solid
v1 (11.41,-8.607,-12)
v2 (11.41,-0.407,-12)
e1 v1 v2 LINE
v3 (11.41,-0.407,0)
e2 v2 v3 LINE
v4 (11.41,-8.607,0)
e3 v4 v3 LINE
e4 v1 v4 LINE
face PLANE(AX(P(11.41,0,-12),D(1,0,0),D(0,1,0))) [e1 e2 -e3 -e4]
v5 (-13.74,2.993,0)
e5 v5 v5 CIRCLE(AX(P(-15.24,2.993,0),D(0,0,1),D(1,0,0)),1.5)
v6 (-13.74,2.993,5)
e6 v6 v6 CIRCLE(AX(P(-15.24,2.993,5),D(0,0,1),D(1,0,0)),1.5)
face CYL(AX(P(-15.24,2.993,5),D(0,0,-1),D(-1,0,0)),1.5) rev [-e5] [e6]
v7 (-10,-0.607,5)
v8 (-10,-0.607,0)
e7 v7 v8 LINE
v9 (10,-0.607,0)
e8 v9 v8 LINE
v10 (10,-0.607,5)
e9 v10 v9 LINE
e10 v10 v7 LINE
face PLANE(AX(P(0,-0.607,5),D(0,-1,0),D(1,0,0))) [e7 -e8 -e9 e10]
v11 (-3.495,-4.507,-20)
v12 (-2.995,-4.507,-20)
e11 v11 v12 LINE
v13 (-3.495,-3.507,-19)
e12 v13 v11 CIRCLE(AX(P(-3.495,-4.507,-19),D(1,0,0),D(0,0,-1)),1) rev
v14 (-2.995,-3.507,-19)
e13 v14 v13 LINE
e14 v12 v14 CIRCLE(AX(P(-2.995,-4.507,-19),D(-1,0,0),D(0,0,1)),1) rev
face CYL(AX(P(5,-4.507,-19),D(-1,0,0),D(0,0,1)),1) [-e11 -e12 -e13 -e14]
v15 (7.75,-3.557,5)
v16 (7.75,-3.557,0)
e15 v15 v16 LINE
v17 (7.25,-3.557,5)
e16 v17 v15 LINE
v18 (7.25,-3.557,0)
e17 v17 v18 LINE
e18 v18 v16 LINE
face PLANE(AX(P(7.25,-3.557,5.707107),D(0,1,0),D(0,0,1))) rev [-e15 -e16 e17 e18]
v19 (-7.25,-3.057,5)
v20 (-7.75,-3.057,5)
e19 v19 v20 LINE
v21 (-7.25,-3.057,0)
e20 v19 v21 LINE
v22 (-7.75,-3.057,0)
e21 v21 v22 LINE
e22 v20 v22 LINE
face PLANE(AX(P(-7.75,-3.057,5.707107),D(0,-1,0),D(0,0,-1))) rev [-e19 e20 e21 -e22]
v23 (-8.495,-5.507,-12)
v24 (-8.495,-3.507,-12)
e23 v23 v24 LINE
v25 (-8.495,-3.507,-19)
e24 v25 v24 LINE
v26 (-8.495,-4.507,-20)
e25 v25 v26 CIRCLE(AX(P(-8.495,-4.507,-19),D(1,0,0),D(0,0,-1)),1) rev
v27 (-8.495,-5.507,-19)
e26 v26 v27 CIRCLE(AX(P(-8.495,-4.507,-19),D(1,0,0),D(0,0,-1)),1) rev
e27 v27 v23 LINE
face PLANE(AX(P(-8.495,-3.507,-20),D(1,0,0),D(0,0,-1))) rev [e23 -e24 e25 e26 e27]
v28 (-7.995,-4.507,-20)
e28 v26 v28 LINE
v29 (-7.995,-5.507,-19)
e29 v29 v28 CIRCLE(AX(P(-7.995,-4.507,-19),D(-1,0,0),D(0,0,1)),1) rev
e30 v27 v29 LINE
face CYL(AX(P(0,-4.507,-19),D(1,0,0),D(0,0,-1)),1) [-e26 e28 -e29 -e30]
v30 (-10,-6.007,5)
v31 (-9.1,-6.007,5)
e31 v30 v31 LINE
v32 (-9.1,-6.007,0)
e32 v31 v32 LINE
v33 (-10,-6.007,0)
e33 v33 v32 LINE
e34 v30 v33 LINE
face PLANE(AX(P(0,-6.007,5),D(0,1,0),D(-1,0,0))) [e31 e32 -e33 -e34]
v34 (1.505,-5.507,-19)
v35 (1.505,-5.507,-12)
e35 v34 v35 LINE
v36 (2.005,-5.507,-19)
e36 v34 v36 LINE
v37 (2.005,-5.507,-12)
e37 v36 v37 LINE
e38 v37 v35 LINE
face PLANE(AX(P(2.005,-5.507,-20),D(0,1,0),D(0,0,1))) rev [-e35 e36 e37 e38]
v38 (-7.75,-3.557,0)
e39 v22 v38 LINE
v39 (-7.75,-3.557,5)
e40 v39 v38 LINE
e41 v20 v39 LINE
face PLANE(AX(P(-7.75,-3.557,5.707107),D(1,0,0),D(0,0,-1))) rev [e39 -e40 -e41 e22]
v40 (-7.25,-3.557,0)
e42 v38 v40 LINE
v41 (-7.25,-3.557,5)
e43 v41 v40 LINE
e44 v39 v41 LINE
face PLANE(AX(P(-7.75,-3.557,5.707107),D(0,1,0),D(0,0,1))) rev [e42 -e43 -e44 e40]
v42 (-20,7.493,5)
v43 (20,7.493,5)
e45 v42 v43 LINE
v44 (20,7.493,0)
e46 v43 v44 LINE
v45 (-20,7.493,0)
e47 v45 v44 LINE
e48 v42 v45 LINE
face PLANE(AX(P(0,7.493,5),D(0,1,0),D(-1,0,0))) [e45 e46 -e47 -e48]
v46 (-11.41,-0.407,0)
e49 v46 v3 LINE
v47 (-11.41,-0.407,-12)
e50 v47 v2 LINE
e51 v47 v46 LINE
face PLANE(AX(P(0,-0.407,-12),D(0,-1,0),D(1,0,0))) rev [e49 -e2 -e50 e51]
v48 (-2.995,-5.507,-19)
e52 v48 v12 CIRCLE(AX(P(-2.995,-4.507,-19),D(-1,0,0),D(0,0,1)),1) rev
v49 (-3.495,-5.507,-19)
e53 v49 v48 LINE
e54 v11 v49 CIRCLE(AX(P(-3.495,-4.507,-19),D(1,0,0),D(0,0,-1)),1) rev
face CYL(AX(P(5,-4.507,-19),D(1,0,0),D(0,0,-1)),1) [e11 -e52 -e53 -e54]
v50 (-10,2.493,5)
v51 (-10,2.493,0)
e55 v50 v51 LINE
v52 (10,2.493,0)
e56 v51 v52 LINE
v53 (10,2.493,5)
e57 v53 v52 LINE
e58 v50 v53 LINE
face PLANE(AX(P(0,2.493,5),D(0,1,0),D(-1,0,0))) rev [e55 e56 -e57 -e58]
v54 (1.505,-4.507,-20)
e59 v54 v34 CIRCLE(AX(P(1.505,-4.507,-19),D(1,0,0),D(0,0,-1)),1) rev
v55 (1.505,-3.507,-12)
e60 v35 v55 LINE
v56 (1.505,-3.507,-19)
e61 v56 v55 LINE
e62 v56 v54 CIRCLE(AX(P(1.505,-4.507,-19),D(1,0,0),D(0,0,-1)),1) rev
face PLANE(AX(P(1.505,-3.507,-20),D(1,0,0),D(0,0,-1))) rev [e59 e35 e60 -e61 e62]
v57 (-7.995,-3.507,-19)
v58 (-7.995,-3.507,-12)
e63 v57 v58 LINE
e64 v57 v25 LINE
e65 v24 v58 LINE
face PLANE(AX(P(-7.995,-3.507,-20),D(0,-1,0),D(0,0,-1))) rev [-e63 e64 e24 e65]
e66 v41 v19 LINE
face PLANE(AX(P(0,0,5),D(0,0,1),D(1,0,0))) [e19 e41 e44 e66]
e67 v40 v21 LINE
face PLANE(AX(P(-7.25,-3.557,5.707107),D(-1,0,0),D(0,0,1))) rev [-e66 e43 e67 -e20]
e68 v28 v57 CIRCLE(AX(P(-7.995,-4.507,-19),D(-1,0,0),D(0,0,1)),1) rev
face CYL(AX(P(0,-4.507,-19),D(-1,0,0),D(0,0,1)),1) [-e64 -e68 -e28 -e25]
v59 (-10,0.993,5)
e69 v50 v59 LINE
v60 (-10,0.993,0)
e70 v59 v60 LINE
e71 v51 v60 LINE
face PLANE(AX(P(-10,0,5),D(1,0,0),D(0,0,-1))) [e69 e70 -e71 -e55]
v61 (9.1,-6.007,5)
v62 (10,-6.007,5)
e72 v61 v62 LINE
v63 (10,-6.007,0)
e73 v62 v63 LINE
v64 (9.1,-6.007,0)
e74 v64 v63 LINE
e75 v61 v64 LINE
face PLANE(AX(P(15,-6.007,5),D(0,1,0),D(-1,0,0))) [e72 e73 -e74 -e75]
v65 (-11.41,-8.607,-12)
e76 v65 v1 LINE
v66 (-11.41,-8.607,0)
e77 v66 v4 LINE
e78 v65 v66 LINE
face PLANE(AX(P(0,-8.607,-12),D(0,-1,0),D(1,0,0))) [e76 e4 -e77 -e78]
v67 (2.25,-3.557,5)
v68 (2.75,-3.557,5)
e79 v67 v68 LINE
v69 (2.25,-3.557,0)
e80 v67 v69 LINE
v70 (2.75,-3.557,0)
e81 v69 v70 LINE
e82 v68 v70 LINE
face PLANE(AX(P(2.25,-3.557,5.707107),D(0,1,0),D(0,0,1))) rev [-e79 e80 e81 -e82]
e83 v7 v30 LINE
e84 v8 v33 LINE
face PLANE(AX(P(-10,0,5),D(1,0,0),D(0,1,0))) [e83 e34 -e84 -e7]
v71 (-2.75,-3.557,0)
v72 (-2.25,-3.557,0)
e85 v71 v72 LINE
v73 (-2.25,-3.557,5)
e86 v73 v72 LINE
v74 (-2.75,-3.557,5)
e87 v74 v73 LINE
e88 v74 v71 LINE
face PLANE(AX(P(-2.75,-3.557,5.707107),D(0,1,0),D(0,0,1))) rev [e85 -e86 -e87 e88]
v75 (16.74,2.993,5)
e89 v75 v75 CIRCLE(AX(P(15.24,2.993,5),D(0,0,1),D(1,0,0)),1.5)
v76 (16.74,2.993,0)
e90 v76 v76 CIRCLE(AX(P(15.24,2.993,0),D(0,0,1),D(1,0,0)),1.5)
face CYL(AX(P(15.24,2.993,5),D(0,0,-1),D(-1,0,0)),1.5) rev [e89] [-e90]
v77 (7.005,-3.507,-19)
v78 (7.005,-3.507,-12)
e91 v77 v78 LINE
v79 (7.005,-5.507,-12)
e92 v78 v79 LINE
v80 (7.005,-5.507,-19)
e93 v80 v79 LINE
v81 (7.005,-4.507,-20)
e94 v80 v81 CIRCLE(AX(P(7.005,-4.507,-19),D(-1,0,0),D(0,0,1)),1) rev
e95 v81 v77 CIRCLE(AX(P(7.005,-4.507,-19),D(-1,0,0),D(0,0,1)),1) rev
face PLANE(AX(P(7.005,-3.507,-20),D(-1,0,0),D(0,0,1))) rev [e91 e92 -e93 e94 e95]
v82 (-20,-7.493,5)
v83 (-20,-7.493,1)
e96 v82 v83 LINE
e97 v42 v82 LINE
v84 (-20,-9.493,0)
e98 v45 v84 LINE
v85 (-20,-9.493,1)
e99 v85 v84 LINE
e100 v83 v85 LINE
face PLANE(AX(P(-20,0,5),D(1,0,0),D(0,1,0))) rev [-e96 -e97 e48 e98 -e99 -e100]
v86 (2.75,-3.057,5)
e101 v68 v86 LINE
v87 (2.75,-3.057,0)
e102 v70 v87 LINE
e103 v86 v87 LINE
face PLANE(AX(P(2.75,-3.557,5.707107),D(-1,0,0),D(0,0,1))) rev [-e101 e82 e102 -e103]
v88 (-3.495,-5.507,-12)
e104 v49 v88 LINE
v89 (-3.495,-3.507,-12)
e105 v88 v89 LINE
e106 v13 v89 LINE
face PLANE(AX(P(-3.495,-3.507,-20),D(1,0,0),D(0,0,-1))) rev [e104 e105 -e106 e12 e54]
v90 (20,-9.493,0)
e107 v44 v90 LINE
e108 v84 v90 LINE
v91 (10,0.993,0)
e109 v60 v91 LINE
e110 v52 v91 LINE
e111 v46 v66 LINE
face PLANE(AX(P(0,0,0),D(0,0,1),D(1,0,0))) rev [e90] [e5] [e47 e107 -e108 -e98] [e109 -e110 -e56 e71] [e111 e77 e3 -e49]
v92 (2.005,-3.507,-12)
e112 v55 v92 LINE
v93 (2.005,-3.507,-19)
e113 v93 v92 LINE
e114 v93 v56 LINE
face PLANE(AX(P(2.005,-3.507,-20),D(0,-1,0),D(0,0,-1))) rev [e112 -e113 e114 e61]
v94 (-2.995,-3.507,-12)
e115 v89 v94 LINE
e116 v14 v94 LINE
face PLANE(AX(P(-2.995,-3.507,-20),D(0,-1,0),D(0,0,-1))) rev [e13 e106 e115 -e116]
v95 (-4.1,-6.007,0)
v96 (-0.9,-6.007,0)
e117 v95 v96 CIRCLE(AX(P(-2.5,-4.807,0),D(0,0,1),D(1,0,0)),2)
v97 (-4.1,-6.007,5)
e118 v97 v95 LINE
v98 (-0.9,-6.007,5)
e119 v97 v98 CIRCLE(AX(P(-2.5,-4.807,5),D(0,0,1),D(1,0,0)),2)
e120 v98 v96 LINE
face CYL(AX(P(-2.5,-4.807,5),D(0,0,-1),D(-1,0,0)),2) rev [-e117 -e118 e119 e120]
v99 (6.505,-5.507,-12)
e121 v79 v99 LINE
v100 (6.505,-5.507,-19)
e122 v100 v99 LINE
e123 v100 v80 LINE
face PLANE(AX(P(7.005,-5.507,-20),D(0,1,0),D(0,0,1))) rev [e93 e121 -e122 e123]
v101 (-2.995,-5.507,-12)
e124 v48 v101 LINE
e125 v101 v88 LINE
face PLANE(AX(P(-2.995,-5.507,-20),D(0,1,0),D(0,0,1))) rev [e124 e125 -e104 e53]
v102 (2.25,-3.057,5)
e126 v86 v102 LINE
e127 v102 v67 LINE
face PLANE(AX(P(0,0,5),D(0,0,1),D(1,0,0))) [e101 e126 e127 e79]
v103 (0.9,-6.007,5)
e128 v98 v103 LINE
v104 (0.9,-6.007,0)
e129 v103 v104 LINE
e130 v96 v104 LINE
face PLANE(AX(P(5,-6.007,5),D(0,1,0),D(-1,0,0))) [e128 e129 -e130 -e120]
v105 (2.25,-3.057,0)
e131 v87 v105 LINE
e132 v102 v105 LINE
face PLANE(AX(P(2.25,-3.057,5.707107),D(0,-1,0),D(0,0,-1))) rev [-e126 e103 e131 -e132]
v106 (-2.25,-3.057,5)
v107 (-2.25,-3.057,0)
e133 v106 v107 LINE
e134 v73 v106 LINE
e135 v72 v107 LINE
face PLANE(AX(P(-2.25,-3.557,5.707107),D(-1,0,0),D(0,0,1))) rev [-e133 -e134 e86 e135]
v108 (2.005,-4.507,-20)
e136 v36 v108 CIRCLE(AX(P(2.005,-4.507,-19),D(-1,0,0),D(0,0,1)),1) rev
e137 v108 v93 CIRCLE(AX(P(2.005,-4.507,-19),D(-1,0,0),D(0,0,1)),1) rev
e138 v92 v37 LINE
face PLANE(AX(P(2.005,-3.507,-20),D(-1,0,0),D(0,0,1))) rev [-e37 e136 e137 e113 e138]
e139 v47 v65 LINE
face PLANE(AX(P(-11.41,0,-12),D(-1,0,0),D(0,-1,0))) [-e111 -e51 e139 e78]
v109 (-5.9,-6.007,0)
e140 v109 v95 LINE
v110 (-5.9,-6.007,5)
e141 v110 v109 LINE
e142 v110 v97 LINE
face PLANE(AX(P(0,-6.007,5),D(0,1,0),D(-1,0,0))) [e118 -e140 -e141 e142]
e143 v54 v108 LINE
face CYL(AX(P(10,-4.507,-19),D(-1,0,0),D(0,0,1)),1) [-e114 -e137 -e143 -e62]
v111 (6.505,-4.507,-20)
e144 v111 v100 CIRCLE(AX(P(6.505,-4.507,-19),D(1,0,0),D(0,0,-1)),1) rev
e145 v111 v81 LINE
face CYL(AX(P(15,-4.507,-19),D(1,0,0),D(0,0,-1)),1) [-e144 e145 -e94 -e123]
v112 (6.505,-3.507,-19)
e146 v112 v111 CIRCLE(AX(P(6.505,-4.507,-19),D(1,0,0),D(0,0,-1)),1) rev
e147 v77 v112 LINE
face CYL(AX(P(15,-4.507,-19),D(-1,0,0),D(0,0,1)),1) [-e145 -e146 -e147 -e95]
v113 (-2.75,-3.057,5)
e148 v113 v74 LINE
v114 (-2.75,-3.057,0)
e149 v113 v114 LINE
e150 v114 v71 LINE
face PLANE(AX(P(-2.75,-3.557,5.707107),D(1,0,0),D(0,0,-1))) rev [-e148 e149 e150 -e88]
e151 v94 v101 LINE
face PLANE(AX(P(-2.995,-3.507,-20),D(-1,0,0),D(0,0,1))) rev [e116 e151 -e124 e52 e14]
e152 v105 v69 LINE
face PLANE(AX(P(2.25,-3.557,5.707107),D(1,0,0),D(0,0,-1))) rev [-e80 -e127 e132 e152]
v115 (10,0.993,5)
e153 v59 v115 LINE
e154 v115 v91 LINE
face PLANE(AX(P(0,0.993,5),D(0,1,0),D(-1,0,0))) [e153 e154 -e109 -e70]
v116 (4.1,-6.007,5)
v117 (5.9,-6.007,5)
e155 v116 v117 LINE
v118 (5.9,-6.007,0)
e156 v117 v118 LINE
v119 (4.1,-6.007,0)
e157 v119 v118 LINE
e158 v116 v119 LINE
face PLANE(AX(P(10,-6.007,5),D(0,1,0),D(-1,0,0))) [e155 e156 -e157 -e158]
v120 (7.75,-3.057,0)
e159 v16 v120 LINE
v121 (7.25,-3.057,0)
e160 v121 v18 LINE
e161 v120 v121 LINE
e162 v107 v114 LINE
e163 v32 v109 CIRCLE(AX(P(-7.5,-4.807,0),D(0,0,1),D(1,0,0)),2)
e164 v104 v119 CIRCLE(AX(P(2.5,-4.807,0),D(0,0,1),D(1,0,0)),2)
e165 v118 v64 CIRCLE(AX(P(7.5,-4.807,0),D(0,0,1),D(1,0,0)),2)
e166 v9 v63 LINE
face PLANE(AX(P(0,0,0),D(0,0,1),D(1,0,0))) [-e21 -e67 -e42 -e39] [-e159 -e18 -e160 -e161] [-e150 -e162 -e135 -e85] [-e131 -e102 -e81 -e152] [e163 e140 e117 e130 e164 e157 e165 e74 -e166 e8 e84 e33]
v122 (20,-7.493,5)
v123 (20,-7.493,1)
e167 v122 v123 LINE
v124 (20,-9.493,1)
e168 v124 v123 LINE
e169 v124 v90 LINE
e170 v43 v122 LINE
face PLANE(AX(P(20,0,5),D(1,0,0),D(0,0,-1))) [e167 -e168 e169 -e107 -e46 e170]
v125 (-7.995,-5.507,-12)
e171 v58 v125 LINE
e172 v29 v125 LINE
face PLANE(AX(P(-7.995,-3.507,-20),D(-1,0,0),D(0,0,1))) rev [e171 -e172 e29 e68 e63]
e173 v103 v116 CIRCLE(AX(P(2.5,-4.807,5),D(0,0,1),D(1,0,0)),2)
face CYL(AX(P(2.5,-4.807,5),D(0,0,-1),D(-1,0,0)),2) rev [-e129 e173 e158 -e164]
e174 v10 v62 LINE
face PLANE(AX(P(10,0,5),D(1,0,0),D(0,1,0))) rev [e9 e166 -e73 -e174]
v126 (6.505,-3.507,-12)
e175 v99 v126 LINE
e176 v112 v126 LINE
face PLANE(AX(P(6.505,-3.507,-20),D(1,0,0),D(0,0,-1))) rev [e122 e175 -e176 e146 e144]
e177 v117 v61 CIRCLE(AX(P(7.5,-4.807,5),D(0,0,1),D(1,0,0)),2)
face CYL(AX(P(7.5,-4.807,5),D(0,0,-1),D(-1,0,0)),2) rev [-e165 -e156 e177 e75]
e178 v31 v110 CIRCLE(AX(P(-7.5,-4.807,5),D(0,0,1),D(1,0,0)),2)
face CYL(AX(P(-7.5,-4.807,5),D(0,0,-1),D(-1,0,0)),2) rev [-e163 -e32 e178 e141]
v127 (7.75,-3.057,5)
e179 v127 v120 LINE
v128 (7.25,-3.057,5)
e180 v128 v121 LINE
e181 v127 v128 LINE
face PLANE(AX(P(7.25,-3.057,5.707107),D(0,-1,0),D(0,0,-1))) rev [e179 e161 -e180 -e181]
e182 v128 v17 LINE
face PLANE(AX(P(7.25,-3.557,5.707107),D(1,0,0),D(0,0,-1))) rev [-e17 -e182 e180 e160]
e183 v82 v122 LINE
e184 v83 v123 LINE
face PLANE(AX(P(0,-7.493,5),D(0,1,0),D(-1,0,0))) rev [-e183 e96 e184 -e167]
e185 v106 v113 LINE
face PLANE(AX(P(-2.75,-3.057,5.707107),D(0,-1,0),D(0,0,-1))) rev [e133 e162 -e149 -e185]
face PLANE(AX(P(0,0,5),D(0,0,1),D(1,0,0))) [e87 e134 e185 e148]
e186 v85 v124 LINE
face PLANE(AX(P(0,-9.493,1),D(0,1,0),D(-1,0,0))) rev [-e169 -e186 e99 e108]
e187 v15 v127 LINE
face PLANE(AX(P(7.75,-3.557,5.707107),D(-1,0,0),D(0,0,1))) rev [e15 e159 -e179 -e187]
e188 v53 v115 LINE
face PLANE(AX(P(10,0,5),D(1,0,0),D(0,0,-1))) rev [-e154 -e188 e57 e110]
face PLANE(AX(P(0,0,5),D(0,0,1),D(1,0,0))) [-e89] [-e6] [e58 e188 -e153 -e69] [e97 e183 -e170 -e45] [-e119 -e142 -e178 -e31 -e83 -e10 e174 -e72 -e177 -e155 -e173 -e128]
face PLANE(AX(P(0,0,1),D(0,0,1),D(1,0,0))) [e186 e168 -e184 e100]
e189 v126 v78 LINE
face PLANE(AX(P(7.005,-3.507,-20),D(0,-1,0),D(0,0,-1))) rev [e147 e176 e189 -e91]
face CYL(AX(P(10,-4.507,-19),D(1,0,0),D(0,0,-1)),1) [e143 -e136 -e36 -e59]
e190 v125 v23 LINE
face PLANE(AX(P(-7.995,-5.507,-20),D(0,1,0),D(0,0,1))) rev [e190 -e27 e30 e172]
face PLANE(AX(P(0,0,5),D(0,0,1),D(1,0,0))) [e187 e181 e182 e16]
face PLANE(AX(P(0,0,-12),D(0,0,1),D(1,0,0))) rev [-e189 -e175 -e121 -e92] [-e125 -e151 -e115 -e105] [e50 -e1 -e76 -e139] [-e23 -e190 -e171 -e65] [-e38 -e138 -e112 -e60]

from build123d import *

# Parameters (mm, degrees)
SKETCH1_R              = 1.5
SKETCH1_W              = 20
SKETCH1_H              = 1.5
SKETCH1_W_2            = 22.82
SKETCH1_H_2            = 7.086
BOSS_EXTRUDE1_DEPTH    = 5
SKETCH1_3_W            = 22.82
SKETCH1_3_H            = 1.114
BOSS_EXTRUDE2_DEPTH    = 1
CUT_EXTRUDE1_DEPTH     = 23.696190187
LPATTERN1_COUNT        = 4
LPATTERN1_PITCH        = 5
BOSS_EXTRUDE3_START    = -12
SKETCH1_5_W            = 22.82
SKETCH1_5_H            = 7.086
SKETCH1_5_H_2          = 1.114
BOSS_EXTRUDE3_DEPTH    = 12
SKETCH4_W              = 0.5
SKETCH4_H              = 0.5
BOSS_EXTRUDE4_DEPTH    = 5
SKETCH5_W              = 0.5
SKETCH5_H              = 2
BOSS_EXTRUDE5_DEPTH    = 8
FILLET1_R              = 1
LPATTERN2_COUNT        = 4
LPATTERN2_PITCH        = 5
FILLET1_OF_LPATTERN2_R = 1


with BuildPart() as part:
    # Sketch1 → Boss-Extrude1 (new body)
    # profile 1 of 3: a face of its own
    with BuildSketch(Plane.XY):
        Polygon((20, 7.493), (-20, 7.493), (-20, -7.493), (-11.41, -7.493), (-11.41, -0.407), (11.41, -0.407), (11.41, -7.493), (20, -7.493), align=None)
        with Locations((-15.24, 2.993)):
            Circle(SKETCH1_R, mode=Mode.SUBTRACT)
        with Locations((0, 1.743)):
            Rectangle(SKETCH1_W, SKETCH1_H, mode=Mode.SUBTRACT)
        with Locations((15.24, 2.993)):
            Circle(SKETCH1_R, mode=Mode.SUBTRACT)
    # profile 2 of 3: a face of its own
    with BuildSketch(Plane.XY):
        with Locations((0, -3.95)):
            Rectangle(SKETCH1_W_2, SKETCH1_H_2)
        with BuildLine():
            Line((-10, -0.607), (-5, -0.607))
            Line((-5, -0.607), (-5, -6.007))
            Line((-5, -6.007), (-5.9, -6.007))
            ThreePointArc((-5.9, -6.007), (-7.5, -6.807), (-9.1, -6.007))
            Line((-9.1, -6.007), (-10, -6.007))
            Line((-10, -6.007), (-10, -0.607))
        make_face(mode=Mode.SUBTRACT)
    # profile 3 of 3: a face of its own
    with BuildSketch(Plane.XY):
        with BuildLine():
            Line((-10, -6.007), (-9.1, -6.007))
            ThreePointArc((-9.1, -6.007), (-7.5, -6.807), (-5.9, -6.007))
            Line((-5.9, -6.007), (-5, -6.007))
            Line((-5, -6.007), (-5, -0.607))
            Line((-5, -0.607), (-10, -0.607))
            Line((-10, -0.607), (-10, -6.007))
        make_face()
    extrude(amount=BOSS_EXTRUDE1_DEPTH)

    # Sketch1<3> → Boss-Extrude2 (add)
    with BuildSketch(Plane.XY):
        Polygon((-11.41, -7.493), (-20, -7.493), (-20, -9.493), (20, -9.493), (20, -7.493), (11.41, -7.493), (11.41, -8.607), (-11.41, -8.607), align=None)
        with Locations((0, -8.05)):
            Rectangle(SKETCH1_3_W, SKETCH1_3_H)
    extrude(amount=BOSS_EXTRUDE2_DEPTH)

    # Sketch1<4> → Cut-Extrude1 (cut, through all)
    with BuildSketch(Plane.XY):
        with BuildLine():
            Line((-10, -6.007), (-9.1, -6.007))
            ThreePointArc((-9.1, -6.007), (-7.5, -6.807), (-5.9, -6.007))
            Line((-5.9, -6.007), (-5, -6.007))
            Line((-5, -6.007), (-5, -0.607))
            Line((-5, -0.607), (-10, -0.607))
            Line((-10, -0.607), (-10, -6.007))
        make_face()
    cut_extrude1 = extrude(amount=CUT_EXTRUDE1_DEPTH, mode=Mode.SUBTRACT)

    # LPattern1: Cut-Extrude1 ×4
    with Locations(*[(i * LPATTERN1_PITCH, 0, 0) for i in range(1, LPATTERN1_COUNT)]):
        add(cut_extrude1, mode=Mode.SUBTRACT)

    # Sketch1<5> → Boss-Extrude3 (add)
    # profile 1 of 3: a face of its own
    with BuildSketch(Plane.XY.offset(BOSS_EXTRUDE3_START)):
        with Locations((0, -3.95)):
            Rectangle(SKETCH1_5_W, SKETCH1_5_H)
        with BuildLine():
            Line((-10, -0.607), (-5, -0.607))
            Line((-5, -0.607), (-5, -6.007))
            Line((-5, -6.007), (-5.9, -6.007))
            ThreePointArc((-5.9, -6.007), (-7.5, -6.807), (-9.1, -6.007))
            Line((-9.1, -6.007), (-10, -6.007))
            Line((-10, -6.007), (-10, -0.607))
        make_face(mode=Mode.SUBTRACT)
    # profile 2 of 3: a face of its own
    with BuildSketch(Plane.XY.offset(BOSS_EXTRUDE3_START)):
        with BuildLine():
            Line((-10, -6.007), (-9.1, -6.007))
            ThreePointArc((-9.1, -6.007), (-7.5, -6.807), (-5.9, -6.007))
            Line((-5.9, -6.007), (-5, -6.007))
            Line((-5, -6.007), (-5, -0.607))
            Line((-5, -0.607), (-10, -0.607))
            Line((-10, -0.607), (-10, -6.007))
        make_face()
    # profile 3 of 3: a face of its own
    with BuildSketch(Plane.XY.offset(BOSS_EXTRUDE3_START)):
        with Locations((0, -8.05)):
            Rectangle(SKETCH1_5_W, SKETCH1_5_H_2)
    extrude(amount=BOSS_EXTRUDE3_DEPTH)

    # Sketch4 → Boss-Extrude4 (add)
    with BuildSketch(Plane.XY):
        with Locations((-7.5, -3.307)):
            Rectangle(SKETCH4_W, SKETCH4_H)
    boss_extrude4 = extrude(amount=BOSS_EXTRUDE4_DEPTH)

    # Sketch5 → Boss-Extrude5 (add)
    with BuildSketch(Plane(origin=(0, 0, -12), x_dir=(-1, 0, 0), z_dir=(0, 0, -1))):
        with Locations((8.245, -4.507)):
            Rectangle(SKETCH5_W, SKETCH5_H)
    boss_extrude5 = extrude(amount=BOSS_EXTRUDE5_DEPTH)

    # Fillet1
    fillet1_edges = [part.edges().sort_by_distance(p)[0] for p in [
        (-8.245, -5.507, -20),
        (-8.245, -3.507, -20),
    ]]
    fillet(fillet1_edges, radius=FILLET1_R - 0.0001)  # a hair under: the kernel refuses the full size

    # LPattern2: Boss-Extrude4, Boss-Extrude5 ×4
    with Locations(*[(i * LPATTERN2_PITCH, 0, 0) for i in range(1, LPATTERN2_COUNT)]):
        add(boss_extrude4)
        add(boss_extrude5)

    # Fillet1 of LPattern2
    fillet1_of_lpattern2_edges = [part.edges().sort_by_distance(p)[0] for p in [
        (-3.245, -5.507, -20),
        (-3.245, -3.507, -20),
        (1.755, -5.507, -20),
        (1.755, -3.507, -20),
        (6.755, -5.507, -20),
        (6.755, -3.507, -20),
    ]]
    fillet(fillet1_of_lpattern2_edges, radius=FILLET1_OF_LPATTERN2_R - 0.0001)  # a hair under: the kernel refuses the full size


solid = part.part
